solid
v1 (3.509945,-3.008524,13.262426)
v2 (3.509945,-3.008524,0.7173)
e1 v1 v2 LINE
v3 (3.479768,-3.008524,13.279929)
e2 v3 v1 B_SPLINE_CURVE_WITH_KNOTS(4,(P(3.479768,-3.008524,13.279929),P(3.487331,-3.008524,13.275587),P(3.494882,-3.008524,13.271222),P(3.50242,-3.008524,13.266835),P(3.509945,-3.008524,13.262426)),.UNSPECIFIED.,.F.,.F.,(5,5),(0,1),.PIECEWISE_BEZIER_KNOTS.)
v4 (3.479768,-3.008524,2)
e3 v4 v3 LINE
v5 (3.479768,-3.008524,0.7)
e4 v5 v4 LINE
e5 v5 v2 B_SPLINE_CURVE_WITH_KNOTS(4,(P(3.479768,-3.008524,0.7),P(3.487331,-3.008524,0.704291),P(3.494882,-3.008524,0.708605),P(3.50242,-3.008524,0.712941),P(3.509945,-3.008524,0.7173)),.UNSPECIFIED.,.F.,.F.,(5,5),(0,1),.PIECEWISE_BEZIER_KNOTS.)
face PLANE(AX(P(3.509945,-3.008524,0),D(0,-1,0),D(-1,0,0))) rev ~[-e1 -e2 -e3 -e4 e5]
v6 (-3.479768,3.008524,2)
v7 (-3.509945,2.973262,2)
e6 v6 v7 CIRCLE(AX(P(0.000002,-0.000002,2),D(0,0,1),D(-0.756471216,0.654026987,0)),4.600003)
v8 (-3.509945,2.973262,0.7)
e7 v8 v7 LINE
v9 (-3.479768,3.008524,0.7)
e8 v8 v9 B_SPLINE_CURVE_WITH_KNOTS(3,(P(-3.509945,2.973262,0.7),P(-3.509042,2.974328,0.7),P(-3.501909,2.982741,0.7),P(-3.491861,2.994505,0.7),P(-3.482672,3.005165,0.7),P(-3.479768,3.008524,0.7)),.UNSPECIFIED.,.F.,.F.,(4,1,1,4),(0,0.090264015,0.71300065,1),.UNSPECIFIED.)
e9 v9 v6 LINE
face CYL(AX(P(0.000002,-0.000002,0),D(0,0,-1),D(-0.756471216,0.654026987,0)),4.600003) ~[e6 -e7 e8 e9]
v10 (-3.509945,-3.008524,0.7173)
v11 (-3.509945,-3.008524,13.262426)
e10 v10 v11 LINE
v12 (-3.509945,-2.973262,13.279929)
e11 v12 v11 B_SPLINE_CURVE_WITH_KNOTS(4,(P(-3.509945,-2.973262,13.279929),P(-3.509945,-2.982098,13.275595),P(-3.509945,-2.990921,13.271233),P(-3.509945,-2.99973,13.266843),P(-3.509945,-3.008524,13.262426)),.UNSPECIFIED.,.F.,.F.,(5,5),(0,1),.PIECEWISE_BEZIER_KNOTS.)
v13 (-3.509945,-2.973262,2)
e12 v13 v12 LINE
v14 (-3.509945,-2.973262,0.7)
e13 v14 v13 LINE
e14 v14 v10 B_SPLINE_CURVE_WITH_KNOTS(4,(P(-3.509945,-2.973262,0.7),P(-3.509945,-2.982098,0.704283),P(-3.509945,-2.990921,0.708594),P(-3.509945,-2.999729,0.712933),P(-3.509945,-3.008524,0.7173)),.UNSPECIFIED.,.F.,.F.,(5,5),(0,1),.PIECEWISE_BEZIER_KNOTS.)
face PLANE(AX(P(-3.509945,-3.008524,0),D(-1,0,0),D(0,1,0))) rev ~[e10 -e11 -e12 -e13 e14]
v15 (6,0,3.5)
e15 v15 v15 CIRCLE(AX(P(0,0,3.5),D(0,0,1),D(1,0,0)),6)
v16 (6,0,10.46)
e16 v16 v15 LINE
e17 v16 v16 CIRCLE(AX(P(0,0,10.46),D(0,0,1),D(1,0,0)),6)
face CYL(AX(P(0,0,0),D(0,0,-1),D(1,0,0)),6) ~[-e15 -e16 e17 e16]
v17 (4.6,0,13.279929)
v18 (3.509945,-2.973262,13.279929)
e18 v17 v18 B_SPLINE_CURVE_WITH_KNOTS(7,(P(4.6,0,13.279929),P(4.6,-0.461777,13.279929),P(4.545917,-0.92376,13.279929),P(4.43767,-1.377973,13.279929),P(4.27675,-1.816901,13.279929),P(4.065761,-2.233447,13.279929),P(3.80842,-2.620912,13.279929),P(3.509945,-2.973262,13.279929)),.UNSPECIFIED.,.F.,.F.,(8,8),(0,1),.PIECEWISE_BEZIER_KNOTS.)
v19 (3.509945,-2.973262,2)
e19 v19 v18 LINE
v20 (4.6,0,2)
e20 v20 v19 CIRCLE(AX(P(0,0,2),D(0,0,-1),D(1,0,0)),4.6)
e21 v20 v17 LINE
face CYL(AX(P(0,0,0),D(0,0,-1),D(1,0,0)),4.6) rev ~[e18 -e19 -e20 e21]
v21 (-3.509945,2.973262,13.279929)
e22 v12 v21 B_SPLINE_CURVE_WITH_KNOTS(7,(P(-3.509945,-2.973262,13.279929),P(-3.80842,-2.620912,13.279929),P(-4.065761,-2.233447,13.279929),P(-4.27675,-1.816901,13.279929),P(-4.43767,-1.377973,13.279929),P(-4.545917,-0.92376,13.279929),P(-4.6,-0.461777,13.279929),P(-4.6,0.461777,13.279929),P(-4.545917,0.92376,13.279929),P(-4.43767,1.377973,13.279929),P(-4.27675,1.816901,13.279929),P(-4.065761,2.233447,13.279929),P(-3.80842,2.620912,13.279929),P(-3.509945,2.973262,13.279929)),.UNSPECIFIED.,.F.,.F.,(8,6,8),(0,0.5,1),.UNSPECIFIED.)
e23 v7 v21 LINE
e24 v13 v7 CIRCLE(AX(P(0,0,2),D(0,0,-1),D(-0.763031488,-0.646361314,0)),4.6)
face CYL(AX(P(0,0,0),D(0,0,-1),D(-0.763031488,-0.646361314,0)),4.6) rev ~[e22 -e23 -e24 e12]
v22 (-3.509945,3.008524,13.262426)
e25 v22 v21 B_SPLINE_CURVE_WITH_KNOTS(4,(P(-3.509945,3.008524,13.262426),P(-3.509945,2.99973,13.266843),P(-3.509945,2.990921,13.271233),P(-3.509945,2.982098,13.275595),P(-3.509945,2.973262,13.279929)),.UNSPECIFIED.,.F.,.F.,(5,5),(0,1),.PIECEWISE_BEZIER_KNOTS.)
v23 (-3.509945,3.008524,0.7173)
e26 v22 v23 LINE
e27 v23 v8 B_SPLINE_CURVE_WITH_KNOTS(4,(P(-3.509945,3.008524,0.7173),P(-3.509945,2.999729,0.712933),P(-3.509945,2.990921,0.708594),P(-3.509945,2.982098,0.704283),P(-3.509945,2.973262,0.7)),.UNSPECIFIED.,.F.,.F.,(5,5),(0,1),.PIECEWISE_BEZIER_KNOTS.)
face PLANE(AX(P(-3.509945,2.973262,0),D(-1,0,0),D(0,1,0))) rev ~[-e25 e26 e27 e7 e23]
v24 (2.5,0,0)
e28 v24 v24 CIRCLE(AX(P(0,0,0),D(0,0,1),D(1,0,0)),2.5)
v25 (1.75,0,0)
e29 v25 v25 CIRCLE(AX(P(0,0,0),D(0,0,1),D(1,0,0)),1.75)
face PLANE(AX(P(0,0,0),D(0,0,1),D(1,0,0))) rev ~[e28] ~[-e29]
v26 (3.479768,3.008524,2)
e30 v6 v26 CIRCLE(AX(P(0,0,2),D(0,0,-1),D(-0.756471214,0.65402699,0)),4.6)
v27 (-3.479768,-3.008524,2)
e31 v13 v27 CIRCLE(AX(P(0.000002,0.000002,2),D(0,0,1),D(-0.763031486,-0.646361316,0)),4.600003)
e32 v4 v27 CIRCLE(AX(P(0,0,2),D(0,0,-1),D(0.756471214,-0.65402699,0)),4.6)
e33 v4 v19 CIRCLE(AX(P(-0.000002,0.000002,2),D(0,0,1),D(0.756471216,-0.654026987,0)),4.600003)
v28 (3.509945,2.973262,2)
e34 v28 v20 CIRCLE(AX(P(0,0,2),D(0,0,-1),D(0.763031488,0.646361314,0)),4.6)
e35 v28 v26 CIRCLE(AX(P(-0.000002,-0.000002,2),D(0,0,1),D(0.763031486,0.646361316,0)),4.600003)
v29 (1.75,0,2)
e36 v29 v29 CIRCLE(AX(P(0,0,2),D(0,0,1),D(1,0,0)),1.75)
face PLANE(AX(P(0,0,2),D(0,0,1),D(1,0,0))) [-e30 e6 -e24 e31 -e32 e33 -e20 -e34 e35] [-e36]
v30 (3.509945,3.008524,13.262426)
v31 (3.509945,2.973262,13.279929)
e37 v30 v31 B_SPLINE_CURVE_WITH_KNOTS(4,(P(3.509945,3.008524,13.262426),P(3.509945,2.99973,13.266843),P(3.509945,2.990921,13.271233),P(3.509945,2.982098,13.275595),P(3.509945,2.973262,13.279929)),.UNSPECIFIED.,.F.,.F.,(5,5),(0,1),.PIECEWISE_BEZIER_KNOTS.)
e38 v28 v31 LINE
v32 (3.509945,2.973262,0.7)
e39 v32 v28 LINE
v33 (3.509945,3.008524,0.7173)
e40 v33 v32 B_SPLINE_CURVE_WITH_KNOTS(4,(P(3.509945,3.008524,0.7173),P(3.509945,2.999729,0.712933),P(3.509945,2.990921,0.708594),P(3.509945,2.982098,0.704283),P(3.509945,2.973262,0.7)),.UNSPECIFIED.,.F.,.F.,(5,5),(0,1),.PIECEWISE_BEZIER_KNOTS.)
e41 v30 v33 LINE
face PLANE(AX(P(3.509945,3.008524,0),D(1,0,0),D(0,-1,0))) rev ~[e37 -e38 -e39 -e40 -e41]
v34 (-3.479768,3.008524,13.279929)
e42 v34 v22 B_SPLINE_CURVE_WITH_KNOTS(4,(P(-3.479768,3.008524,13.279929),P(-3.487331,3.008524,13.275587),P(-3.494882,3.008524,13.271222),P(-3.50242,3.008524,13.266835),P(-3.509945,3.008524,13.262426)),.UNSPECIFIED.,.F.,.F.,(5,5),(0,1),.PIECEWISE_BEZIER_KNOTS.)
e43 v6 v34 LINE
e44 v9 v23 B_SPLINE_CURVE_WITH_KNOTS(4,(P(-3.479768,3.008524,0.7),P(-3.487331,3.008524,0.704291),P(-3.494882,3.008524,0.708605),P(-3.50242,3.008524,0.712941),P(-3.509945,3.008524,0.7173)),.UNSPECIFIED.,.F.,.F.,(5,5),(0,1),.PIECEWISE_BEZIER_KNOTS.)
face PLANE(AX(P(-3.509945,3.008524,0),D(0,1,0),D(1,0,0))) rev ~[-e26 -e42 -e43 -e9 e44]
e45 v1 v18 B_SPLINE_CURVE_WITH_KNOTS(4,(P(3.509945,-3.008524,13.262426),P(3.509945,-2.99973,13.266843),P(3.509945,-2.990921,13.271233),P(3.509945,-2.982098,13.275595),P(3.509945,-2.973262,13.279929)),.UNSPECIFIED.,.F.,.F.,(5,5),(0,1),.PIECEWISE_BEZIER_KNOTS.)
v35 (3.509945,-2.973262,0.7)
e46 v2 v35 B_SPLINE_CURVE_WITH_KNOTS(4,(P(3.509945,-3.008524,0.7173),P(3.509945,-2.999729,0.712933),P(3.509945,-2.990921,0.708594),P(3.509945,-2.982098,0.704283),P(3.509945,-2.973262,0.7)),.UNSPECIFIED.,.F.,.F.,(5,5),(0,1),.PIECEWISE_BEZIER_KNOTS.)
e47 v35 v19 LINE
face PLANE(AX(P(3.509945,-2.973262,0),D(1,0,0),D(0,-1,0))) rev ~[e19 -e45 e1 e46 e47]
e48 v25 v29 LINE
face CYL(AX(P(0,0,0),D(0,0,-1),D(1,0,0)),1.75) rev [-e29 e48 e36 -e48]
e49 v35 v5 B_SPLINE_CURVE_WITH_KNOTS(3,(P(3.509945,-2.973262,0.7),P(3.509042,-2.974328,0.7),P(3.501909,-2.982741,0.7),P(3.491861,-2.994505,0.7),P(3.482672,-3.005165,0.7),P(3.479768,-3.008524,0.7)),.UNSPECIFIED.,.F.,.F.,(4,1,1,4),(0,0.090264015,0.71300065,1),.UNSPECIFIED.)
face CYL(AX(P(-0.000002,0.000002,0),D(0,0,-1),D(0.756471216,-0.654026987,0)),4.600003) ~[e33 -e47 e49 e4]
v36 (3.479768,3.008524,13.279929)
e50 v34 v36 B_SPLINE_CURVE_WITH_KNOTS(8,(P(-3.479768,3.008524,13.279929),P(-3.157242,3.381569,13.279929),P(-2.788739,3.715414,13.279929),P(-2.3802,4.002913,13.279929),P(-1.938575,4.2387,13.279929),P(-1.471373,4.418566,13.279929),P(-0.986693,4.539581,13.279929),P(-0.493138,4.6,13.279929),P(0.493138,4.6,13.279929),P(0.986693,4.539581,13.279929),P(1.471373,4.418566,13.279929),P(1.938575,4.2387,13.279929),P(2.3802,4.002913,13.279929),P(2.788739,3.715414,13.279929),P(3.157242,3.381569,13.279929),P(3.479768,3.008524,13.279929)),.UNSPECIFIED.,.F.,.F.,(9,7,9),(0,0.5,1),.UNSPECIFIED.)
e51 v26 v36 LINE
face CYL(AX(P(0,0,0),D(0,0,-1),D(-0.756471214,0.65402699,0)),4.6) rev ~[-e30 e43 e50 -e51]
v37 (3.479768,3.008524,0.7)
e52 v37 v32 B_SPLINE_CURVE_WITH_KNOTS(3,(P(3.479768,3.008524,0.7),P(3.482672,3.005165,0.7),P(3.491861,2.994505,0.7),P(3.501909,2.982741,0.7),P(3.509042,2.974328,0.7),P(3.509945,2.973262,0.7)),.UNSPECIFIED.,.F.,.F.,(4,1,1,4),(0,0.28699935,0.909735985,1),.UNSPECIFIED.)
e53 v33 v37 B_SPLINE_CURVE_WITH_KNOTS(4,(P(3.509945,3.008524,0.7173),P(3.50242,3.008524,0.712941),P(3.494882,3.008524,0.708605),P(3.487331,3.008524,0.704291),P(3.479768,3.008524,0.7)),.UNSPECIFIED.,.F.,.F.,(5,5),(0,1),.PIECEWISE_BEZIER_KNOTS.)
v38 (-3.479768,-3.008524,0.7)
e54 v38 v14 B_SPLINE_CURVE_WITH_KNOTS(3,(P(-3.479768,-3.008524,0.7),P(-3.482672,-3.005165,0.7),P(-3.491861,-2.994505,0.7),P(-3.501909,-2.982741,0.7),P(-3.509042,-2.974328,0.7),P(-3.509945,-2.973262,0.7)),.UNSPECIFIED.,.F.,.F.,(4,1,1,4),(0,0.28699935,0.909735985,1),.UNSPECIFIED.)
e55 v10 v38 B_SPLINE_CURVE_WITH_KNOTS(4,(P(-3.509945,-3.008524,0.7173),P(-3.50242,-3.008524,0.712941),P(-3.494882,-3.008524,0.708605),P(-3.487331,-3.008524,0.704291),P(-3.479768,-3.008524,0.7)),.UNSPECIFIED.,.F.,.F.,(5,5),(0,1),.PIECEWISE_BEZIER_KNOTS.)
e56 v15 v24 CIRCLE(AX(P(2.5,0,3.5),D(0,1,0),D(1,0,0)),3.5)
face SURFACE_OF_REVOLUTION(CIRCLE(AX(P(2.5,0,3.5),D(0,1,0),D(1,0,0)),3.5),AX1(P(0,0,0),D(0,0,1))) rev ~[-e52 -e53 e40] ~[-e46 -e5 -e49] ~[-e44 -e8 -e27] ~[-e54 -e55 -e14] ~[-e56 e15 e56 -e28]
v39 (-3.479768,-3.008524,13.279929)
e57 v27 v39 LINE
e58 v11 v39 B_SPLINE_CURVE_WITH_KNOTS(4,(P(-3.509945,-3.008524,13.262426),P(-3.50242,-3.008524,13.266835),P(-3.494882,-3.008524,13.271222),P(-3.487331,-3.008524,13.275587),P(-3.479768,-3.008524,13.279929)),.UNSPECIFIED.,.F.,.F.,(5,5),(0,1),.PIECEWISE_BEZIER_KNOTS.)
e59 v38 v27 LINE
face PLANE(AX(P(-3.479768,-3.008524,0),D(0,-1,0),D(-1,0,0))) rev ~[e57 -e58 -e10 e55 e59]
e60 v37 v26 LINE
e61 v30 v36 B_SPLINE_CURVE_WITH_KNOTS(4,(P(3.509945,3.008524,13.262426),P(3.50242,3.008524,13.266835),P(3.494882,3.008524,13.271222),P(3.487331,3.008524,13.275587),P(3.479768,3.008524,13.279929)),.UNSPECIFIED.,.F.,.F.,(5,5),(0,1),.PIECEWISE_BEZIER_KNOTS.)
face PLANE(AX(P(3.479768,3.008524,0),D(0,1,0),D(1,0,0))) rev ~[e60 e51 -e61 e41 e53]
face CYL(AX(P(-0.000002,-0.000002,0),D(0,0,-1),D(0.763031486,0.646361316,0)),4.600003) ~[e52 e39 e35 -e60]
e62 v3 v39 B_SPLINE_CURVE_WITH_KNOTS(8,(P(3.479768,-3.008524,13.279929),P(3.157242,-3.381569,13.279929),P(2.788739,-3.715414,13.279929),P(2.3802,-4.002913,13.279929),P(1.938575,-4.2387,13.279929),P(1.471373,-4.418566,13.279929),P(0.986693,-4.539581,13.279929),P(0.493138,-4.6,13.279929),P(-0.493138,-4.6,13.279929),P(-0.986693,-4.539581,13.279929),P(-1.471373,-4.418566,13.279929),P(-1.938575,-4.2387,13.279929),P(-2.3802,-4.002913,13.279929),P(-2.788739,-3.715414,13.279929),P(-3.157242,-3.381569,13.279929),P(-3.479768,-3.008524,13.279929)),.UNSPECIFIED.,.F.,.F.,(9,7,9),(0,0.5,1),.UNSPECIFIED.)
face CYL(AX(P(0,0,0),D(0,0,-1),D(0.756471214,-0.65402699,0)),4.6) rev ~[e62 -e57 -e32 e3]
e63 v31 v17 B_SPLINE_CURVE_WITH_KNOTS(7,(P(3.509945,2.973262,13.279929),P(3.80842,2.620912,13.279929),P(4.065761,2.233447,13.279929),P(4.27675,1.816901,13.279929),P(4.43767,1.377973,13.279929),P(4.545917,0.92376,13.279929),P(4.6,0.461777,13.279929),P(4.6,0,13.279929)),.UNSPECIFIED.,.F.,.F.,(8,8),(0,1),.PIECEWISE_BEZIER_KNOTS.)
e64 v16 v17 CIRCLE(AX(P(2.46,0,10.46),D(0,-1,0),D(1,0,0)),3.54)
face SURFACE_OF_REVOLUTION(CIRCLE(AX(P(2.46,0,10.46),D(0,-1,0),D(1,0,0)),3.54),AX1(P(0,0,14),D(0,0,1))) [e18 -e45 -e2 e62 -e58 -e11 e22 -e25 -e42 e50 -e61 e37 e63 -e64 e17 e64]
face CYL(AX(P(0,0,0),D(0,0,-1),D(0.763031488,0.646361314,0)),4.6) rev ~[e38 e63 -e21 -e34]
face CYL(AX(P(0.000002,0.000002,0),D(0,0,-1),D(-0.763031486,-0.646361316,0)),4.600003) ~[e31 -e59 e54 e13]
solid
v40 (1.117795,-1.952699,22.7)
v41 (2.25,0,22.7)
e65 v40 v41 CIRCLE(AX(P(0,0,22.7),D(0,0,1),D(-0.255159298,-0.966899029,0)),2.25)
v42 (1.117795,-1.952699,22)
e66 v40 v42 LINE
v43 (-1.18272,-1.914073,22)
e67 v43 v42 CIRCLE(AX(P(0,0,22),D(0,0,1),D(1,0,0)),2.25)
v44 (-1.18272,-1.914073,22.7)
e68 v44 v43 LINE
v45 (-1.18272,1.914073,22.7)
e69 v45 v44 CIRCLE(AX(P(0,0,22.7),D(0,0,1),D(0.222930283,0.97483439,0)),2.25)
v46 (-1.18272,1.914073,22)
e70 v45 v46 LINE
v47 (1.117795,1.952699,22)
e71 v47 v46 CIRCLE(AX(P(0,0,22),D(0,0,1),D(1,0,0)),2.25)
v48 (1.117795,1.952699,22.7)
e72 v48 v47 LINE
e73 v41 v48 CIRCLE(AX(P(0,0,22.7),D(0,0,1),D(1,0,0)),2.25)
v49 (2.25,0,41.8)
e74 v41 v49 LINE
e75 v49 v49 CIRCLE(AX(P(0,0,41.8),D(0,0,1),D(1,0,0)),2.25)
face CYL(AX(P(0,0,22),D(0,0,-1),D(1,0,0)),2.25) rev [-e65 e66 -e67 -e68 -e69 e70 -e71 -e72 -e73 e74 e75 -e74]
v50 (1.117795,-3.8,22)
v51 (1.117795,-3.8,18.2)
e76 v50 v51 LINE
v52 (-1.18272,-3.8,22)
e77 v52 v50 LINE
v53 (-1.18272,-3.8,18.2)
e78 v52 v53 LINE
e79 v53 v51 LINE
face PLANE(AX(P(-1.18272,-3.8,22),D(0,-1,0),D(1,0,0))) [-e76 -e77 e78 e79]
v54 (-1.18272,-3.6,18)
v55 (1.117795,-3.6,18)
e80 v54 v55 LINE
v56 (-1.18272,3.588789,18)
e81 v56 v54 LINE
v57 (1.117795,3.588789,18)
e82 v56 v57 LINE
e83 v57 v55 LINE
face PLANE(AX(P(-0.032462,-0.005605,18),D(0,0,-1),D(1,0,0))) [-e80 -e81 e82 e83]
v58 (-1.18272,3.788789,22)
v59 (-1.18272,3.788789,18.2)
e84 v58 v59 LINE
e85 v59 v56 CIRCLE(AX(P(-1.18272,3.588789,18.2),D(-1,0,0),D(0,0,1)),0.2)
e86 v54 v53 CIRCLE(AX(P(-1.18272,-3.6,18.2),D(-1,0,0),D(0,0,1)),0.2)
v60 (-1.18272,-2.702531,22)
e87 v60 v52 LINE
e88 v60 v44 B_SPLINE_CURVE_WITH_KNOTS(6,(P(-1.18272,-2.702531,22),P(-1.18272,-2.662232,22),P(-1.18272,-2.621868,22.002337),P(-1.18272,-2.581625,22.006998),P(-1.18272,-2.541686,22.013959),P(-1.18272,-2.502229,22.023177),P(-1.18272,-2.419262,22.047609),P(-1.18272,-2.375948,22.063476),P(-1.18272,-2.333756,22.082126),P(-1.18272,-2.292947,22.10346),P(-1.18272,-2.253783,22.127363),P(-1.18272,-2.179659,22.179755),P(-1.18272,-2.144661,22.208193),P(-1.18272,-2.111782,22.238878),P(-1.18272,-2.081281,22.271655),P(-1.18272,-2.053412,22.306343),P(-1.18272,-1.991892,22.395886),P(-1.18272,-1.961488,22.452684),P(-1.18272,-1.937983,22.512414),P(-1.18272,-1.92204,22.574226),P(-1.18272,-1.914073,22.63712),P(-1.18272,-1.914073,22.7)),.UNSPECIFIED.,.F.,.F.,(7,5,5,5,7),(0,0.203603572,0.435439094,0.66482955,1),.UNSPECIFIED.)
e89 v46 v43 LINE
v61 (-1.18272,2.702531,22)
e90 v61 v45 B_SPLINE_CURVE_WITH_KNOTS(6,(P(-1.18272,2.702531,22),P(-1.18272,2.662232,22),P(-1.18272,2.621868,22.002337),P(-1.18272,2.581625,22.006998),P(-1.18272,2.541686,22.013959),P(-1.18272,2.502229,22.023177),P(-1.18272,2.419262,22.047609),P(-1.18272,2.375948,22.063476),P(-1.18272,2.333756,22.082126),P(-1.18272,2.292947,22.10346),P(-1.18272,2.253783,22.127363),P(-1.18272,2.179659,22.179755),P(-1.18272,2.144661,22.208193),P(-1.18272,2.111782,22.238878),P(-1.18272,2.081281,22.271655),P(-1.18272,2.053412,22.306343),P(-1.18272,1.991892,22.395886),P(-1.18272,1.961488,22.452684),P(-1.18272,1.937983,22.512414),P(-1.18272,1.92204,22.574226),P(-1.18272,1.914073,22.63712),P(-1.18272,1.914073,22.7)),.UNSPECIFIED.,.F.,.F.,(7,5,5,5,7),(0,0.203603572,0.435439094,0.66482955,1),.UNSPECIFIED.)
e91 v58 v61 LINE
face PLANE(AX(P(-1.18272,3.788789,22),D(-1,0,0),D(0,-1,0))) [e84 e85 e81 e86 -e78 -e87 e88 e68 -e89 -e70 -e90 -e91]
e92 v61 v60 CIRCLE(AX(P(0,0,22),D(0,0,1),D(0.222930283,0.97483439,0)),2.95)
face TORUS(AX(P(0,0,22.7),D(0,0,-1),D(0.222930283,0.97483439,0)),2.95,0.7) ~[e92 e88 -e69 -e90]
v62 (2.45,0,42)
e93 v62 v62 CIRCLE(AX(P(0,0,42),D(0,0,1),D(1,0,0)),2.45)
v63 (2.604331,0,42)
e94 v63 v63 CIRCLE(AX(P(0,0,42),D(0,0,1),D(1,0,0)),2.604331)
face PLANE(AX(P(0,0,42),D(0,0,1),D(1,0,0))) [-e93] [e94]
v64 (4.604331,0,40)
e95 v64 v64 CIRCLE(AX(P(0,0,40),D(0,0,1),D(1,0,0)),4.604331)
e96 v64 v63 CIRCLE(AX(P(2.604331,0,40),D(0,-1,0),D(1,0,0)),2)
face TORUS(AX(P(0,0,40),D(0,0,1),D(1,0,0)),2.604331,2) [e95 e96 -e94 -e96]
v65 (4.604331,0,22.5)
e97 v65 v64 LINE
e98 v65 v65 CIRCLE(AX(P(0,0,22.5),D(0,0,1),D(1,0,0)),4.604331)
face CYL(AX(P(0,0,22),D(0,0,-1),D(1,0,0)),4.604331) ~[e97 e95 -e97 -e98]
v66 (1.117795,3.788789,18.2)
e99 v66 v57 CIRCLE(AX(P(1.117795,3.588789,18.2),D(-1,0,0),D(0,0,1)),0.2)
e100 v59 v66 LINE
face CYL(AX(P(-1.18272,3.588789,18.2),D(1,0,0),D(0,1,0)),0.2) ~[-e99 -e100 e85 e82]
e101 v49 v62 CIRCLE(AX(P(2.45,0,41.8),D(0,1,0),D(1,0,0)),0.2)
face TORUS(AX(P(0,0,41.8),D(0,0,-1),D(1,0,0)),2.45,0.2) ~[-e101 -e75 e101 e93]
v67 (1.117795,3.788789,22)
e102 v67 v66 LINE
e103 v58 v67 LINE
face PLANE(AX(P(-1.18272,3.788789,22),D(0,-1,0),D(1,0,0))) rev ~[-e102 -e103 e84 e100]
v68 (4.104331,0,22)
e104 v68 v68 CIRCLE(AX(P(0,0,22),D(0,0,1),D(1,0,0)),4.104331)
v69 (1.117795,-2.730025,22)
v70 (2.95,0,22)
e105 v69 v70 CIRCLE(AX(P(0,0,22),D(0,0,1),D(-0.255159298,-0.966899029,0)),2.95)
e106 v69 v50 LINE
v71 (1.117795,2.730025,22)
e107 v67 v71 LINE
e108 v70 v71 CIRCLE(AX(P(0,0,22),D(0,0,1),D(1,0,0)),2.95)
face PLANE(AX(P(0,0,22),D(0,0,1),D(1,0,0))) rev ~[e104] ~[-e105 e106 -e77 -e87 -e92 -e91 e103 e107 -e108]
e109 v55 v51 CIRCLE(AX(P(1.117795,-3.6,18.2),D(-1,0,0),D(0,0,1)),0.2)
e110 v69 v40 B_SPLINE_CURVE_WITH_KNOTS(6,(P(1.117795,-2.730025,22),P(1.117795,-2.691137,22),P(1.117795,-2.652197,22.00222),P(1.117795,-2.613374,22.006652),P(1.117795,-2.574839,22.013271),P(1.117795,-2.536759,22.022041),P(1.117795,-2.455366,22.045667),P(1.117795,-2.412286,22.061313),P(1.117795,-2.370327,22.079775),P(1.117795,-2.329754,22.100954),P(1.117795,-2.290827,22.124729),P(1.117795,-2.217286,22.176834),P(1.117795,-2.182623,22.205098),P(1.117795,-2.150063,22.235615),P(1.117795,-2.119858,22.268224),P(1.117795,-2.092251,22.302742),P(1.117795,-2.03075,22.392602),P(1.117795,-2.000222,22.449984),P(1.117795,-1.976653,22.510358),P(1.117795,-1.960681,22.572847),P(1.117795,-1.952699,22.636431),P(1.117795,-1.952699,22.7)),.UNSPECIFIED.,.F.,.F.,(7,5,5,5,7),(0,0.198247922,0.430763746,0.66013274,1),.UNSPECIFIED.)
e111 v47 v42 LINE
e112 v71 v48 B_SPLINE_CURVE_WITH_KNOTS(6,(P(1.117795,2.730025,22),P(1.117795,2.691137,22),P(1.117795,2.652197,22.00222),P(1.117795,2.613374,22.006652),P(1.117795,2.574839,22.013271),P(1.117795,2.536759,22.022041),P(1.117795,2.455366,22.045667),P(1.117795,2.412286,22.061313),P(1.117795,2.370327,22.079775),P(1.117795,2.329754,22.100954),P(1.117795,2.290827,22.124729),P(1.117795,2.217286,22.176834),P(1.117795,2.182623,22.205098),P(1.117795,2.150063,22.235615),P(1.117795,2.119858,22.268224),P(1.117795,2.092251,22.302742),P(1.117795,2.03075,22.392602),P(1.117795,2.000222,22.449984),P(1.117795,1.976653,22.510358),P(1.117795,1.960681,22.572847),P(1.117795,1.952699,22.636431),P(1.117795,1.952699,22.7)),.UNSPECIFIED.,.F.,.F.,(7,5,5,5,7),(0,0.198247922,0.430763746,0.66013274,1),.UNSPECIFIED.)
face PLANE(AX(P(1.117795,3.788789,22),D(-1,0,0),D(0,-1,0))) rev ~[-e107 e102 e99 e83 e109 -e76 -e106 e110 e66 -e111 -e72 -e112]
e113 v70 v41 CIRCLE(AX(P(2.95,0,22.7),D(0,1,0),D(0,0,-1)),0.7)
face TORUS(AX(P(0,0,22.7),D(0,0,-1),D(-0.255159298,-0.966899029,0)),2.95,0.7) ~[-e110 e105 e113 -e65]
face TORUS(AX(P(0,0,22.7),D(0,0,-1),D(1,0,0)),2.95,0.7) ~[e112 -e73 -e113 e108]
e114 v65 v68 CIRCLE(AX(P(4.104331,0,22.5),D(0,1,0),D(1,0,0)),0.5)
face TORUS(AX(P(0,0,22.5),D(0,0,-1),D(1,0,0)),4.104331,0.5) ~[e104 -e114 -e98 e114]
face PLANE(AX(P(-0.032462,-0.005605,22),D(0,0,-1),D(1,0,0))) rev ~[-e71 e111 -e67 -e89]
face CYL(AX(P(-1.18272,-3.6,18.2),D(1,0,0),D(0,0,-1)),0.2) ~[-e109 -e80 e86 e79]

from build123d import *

# Parameters (mm, degrees)
F0_R          = 6
F0_R_2        = 1.75
F1_DEPTH      = 2
F2_DEPTH      = 14
F6_START      = 20
F5_R          = 4.6043307529
F5_R_2        = 2.25
F6_DEPTH      = 20
F7_R          = 2
F8_R          = 0.5
F9_W          = 2.3005146742
F9_H          = 7.5887893885
F10_DEPTH     = 4
F11_T4_ANGLE  = 205.7624022978
F11_T9_ANGLE  = 104.7830244865
F11_T14_ANGLE = 104.7830244865
F12_R         = 0.2


# Not quite as in the source:
# - a fillet or chamfer that OpenCascade refuses, or shapes differently, is made with other operations: its cross-section is extruded or revolved along the edge and cut away or added


with BuildPart() as f1:
    # F0 (on Top) → F1 (new body)
    with BuildSketch(Plane.XY):
        Circle(F0_R)
        with BuildLine():
            Line((-3.4797675825, -3.0085241518), (-3.5099448437, -3.0085241518))
            Line((-3.5099448437, -3.0085241518), (-3.5099448437, -2.973262046))
            ThreePointArc((-3.5099448437, -2.973262046), (-4.6, 0), (-3.5099448437, 2.973262046))
            Line((-3.5099448437, 2.973262046), (-3.5099448437, 3.0085241518))
            Line((-3.5099448437, 3.0085241518), (-3.4797675825, 3.0085241518))
            ThreePointArc((-3.4797675825, 3.0085241518), (0, 4.6), (3.4797675825, 3.0085241518))
            Line((3.4797675825, 3.0085241518), (3.5099448437, 3.0085241518))
            Line((3.5099448437, 3.0085241518), (3.5099448437, 2.973262046))
            ThreePointArc((3.5099448437, 2.973262046), (4.3188972135, 1.583390937), (4.6, 0))
            ThreePointArc((4.6, 0), (4.3188972135, -1.583390937), (3.5099448437, -2.973262046))
            Line((3.5099448437, -2.973262046), (3.5099448437, -3.0085241518))
            Line((3.5099448437, -3.0085241518), (3.4797675825, -3.0085241518))
            ThreePointArc((3.4797675825, -3.0085241518), (0, -4.6), (-3.4797675825, -3.0085241518))
        make_face(mode=Mode.SUBTRACT)
        with BuildLine():
            ThreePointArc((3.4797675825, 3.0085241518), (0, 4.6), (-3.4797675825, 3.0085241518))
            Line((-3.4797675825, 3.0085241518), (3.4797675825, 3.0085241518))
        make_face()
        with BuildLine():
            ThreePointArc((-3.5099448437, 2.973262046), (-4.6, 0), (-3.5099448437, -2.973262046))
            Line((-3.5099448437, -2.973262046), (-3.5099448437, 2.973262046))
        make_face()
        with BuildLine():
            ThreePointArc((-3.5099448437, -2.973262046), (-3.4949006859, -2.9909311586), (-3.4797675825, -3.0085241518))
            Line((-3.4797675825, -3.0085241518), (3.4797675825, -3.0085241518))
            ThreePointArc((3.4797675825, -3.0085241518), (3.4949006859, -2.9909311586), (3.5099448437, -2.973262046))
            Line((3.5099448437, -2.973262046), (3.5099448437, 2.973262046))
            ThreePointArc((3.5099448437, 2.973262046), (3.4949006859, 2.9909311586), (3.4797675825, 3.0085241518))
            Line((3.4797675825, 3.0085241518), (-3.4797675825, 3.0085241518))
            ThreePointArc((-3.4797675825, 3.0085241518), (-3.4949006859, 2.9909311586), (-3.5099448437, 2.973262046))
            Line((-3.5099448437, 2.973262046), (-3.5099448437, -2.973262046))
        make_face()
        Circle(F0_R_2, mode=Mode.SUBTRACT)
        with BuildLine():
            Line((3.4797675825, -3.0085241518), (-3.4797675825, -3.0085241518))
            ThreePointArc((-3.4797675825, -3.0085241518), (0, -4.6), (3.4797675825, -3.0085241518))
        make_face()
        with BuildLine():
            Line((3.5099448437, 2.973262046), (3.5099448437, -2.973262046))
            ThreePointArc((3.5099448437, -2.973262046), (4.3188972135, -1.583390937), (4.6, 0))
            ThreePointArc((4.6, 0), (4.3188972135, 1.583390937), (3.5099448437, 2.973262046))
        make_face()
    extrude(amount=F1_DEPTH)

    # F0 (on Top) → F2 (join)
    with BuildSketch(Plane.XY):
        Circle(F0_R)
        with BuildLine():
            Line((-3.4797675825, -3.0085241518), (-3.5099448437, -3.0085241518))
            Line((-3.5099448437, -3.0085241518), (-3.5099448437, -2.973262046))
            ThreePointArc((-3.5099448437, -2.973262046), (-4.6, 0), (-3.5099448437, 2.973262046))
            Line((-3.5099448437, 2.973262046), (-3.5099448437, 3.0085241518))
            Line((-3.5099448437, 3.0085241518), (-3.4797675825, 3.0085241518))
            ThreePointArc((-3.4797675825, 3.0085241518), (0, 4.6), (3.4797675825, 3.0085241518))
            Line((3.4797675825, 3.0085241518), (3.5099448437, 3.0085241518))
            Line((3.5099448437, 3.0085241518), (3.5099448437, 2.973262046))
            ThreePointArc((3.5099448437, 2.973262046), (4.3188972135, 1.583390937), (4.6, 0))
            ThreePointArc((4.6, 0), (4.3188972135, -1.583390937), (3.5099448437, -2.973262046))
            Line((3.5099448437, -2.973262046), (3.5099448437, -3.0085241518))
            Line((3.5099448437, -3.0085241518), (3.4797675825, -3.0085241518))
            ThreePointArc((3.4797675825, -3.0085241518), (0, -4.6), (-3.4797675825, -3.0085241518))
        make_face(mode=Mode.SUBTRACT)
    extrude(amount=F2_DEPTH)

    # F3: fillet of radius 3.5 on 1 edges, made by hand

    # F3_s1 → F3_t2 (revolve, cut)
    with BuildSketch(Plane.XZ):
        with BuildLine():
            ThreePointArc((6, 3.5), (4.9748737342, 1.0251262658), (2.5, 0))
            Line((2.5, 0), (6, 0))
            Line((6, 0), (6, 3.5))
        make_face()
    revolve(axis=Axis((0, 0, 0), (0, 0, 1)), mode=Mode.SUBTRACT)

    # F4: fillet of radius 3.54 on 1 edges, made by hand

    # F4_s1 → F4_t2 (revolve, cut)
    with BuildSketch(Plane.XZ):
        with BuildLine():
            ThreePointArc((6, 10.46), (4.9631580054, 12.9631580054), (2.46, 14))
            Line((2.46, 14), (6, 14))
            Line((6, 14), (6, 10.46))
        make_face()
    revolve(axis=Axis((0, 0, 14), (0, 0, 1)), mode=Mode.SUBTRACT)


with BuildPart() as f6:
    # F5 (on face) → F6 (new body)
    with BuildSketch(Plane.XY.offset(2).offset(F6_START)):
        Circle(F5_R)
        Circle(F5_R_2, mode=Mode.SUBTRACT)
    extrude(amount=F6_DEPTH)

    # F7
    f7_edges = [f6.edges().sort_by_distance(p)[0] for p in [
        (-4.604331, 0, 42),
    ]]
    fillet(f7_edges, radius=F7_R)

    # F8
    f8_edges = [f6.edges().sort_by_distance(p)[0] for p in [
        (-4.604331, 0, 22),
    ]]
    fillet(f8_edges, radius=F8_R)

    # F9 (on face) → F10 (join)
    with BuildSketch(Plane(origin=(0, 0, 22), x_dir=(1, 0, 0), z_dir=(0, 0, -1))):
        with Locations((-0.0324622379, 0.0056053058)):
            Rectangle(F9_W, F9_H)
    extrude(amount=F10_DEPTH)

    # F11: fillet of radius 0.7 on 3 edges, made by hand


with BuildPart() as f11_tool2:
    # F11_s3 → F11_t4 (revolve)
    with BuildSketch(Plane(origin=(0, 0, 0), x_dir=(0, 0, 1), z_dir=(0.9748343905, -0.2229302831, 0))):
        with BuildLine():
            ThreePointArc((22, -2.95), (22.2050252532, -2.4550252532), (22.7, -2.25))
            Line((22.7, -2.25), (22, -2.25))
            Line((22, -2.25), (22, -2.95))
        make_face()
    revolve(axis=Axis((0, 0, 22), (0, 0, 1)), revolution_arc=F11_T4_ANGLE)

    split(bisect_by=Plane.YZ.offset(-1.182719575), keep=Keep.BOTTOM)


with BuildPart() as f6_1:
    add(f6.part)

    # F11_t1: cut F11_tool2
    add(f11_tool2.part, mode=Mode.SUBTRACT)


with BuildPart() as f11_tool7:
    # F11_s8 → F11_t9 (revolve)
    with BuildSketch(Plane.XZ):
        with BuildLine():
            ThreePointArc((2.95, 22), (2.4550252532, 22.2050252532), (2.25, 22.7))
            Line((2.25, 22.7), (2.25, 22))
            Line((2.25, 22), (2.95, 22))
        make_face()
    revolve(axis=Axis((0, 0, 22), (0, 0, 1)), revolution_arc=F11_T9_ANGLE)

    split(bisect_by=Plane.YZ.offset(1.1177950992), keep=Keep.TOP)


with BuildPart() as f6_2:
    add(f6_1.part)

    # F11_t6: cut F11_tool7
    add(f11_tool7.part, mode=Mode.SUBTRACT)


with BuildPart() as f11_tool12:
    # F11_s13 → F11_t14 (revolve)
    with BuildSketch(Plane(origin=(0, 0, 0), x_dir=(0, 0, 1), z_dir=(-0.9668990293, 0.2551592976, 0))):
        with BuildLine():
            ThreePointArc((22, -2.95), (22.2050252532, -2.4550252532), (22.7, -2.25))
            Line((22.7, -2.25), (22, -2.25))
            Line((22, -2.25), (22, -2.95))
        make_face()
    revolve(axis=Axis((0, 0, 22), (0, 0, 1)), revolution_arc=F11_T14_ANGLE)

    split(bisect_by=Plane.YZ.offset(1.1177950992), keep=Keep.TOP)


with BuildPart() as f6_3:
    add(f6_2.part)

    # F11_t11: cut F11_tool12
    add(f11_tool12.part, mode=Mode.SUBTRACT)

    # F12
    f12_edges = [f6_3.edges().sort_by_distance(p)[0] for p in [
        (-2.25, 0, 42),
        (-0.032462, -3.8, 18),
        (-0.032462, 3.788789, 18),
    ]]
    fillet(f12_edges, radius=F12_R)


solid = Compound([f1.part, f6_3.part])
